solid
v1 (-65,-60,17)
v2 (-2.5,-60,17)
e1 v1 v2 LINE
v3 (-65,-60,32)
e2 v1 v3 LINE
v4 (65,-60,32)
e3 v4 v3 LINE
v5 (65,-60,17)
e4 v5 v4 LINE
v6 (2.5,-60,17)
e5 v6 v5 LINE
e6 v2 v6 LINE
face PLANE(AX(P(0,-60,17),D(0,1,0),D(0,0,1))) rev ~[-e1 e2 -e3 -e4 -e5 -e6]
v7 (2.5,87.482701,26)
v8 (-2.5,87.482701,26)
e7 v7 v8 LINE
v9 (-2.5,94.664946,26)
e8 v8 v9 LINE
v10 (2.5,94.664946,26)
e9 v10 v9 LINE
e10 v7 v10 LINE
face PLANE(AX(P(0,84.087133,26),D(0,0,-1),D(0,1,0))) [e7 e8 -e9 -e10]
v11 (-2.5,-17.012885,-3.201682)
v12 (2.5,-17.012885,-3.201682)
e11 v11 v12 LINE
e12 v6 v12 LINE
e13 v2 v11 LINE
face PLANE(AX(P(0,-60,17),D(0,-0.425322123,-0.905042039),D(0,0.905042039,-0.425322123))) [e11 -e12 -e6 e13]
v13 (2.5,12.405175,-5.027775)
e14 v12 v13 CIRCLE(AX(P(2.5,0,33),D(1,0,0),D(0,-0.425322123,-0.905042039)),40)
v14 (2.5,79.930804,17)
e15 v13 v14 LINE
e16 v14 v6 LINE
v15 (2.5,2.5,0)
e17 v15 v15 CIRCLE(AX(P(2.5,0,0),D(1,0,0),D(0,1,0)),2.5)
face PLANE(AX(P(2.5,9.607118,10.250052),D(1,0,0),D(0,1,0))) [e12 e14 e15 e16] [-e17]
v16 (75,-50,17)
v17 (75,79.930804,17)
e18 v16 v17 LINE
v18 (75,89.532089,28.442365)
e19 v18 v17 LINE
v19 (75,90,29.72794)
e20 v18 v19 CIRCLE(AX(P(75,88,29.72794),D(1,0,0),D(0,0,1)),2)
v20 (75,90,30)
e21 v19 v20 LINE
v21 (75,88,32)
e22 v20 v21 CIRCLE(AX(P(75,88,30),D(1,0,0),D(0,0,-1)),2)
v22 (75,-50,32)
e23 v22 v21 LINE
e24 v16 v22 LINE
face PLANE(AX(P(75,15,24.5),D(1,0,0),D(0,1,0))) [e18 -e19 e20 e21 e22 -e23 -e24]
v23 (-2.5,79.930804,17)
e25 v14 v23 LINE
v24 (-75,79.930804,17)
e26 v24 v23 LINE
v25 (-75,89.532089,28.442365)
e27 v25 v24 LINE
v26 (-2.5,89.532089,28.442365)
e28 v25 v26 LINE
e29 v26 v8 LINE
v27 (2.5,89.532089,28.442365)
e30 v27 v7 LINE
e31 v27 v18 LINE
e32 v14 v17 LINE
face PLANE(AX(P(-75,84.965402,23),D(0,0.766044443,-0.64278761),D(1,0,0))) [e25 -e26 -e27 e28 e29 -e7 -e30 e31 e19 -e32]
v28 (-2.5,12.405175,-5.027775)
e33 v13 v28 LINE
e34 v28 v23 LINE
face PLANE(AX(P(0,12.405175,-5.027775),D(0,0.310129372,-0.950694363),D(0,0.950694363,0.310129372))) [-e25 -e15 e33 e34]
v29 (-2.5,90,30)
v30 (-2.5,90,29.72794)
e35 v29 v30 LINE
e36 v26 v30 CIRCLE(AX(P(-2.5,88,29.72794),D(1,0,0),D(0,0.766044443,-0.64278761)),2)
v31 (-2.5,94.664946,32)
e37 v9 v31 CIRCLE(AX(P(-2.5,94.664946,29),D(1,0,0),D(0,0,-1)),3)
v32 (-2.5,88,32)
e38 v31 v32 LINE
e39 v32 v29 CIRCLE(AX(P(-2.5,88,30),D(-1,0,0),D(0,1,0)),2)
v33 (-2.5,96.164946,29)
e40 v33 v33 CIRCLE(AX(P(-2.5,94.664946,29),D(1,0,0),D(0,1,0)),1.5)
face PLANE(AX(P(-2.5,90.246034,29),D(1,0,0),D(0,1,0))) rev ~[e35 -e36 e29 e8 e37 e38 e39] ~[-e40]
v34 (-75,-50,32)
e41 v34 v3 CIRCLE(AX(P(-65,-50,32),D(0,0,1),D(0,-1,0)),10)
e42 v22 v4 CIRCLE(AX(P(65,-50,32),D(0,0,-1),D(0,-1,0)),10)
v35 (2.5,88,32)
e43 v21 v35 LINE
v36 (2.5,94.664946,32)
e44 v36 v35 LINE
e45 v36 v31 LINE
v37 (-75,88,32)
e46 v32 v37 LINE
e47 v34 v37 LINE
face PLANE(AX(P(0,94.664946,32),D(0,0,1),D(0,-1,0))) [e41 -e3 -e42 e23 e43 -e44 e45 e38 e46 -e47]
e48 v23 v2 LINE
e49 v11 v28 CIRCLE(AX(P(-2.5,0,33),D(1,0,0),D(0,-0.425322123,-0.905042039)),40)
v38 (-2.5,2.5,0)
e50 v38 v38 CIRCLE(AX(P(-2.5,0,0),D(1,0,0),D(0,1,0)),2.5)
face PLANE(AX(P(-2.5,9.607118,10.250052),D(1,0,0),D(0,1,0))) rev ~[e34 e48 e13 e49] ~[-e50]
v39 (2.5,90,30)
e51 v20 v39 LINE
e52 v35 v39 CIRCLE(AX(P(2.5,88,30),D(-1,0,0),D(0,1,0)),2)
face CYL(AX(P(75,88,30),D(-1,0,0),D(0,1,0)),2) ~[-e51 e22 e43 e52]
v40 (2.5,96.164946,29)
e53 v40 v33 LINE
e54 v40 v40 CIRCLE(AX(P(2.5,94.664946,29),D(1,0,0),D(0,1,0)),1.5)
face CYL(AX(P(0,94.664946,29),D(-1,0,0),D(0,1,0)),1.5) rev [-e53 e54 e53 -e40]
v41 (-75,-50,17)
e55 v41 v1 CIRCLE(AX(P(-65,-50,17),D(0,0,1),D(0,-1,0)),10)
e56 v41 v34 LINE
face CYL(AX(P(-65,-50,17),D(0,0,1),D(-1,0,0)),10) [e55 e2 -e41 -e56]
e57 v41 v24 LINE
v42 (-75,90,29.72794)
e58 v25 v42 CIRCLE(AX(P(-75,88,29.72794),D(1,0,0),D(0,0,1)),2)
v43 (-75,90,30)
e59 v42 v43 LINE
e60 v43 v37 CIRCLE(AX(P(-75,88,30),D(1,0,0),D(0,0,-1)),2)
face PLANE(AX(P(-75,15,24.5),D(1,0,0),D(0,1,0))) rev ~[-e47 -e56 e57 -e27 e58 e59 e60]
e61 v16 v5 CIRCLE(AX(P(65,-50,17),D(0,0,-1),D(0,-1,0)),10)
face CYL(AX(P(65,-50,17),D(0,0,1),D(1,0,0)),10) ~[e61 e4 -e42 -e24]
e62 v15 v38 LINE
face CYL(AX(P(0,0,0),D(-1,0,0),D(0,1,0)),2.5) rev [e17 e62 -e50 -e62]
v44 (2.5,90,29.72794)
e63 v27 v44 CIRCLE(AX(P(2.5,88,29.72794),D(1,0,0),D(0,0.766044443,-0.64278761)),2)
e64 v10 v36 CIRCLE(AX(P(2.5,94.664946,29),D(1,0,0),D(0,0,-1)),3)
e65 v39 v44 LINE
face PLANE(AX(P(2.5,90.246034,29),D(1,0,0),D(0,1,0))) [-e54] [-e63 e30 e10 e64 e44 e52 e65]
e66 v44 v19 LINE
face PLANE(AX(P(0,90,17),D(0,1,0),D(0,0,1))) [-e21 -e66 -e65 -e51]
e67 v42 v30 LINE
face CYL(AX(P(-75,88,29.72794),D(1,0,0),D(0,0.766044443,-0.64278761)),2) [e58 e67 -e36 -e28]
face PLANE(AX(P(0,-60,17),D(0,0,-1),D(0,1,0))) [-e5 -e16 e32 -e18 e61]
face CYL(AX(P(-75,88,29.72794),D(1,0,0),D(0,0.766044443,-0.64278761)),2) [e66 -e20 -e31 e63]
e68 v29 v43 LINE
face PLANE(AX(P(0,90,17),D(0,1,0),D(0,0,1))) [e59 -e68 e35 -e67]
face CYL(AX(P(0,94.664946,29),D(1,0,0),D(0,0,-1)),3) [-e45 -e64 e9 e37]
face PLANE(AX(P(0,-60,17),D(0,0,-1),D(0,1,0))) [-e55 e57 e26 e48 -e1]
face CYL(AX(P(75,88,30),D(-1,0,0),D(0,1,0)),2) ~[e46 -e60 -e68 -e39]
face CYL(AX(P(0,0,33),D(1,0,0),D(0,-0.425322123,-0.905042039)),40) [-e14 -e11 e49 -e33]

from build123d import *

# Parameters (mm, degrees)
F0_W     = 150
F0_H     = 15
F1_DEPTH = 75
F2_SIZE2 = 10.0691955741
F2_SIZE  = 12
F3_R     = 2
F4_R     = 2.5
F5_DEPTH = 2.5
F6_R     = 1.5
F7_DEPTH = 2.5
F8_R     = 10


with BuildPart() as f1:
    # F0 (on Right) → F1 (new body, symmetric)
    with BuildSketch(Plane.YZ):
        with Locations((15, 24.5)):
            Rectangle(F0_W, F0_H)
    extrude(amount=F1_DEPTH, both=True)

    # F2
    f2_edges = [f1.edges().sort_by_distance(p)[0] for p in [
        (0, 90, 17),
    ]]
    f2_side = f1.faces().sort_by_distance((0, 90, 24.5))[0]
    chamfer(f2_edges, length=F2_SIZE, length2=F2_SIZE2, reference=f2_side)

    # F3
    f3_edges = [f1.edges().sort_by_distance(p)[0] for p in [
        (0, 90, 32),
        (0, 90, 29),
    ]]
    fillet(f3_edges, radius=F3_R)

    # F4 (on Right) → F5 (join, symmetric)
    with BuildSketch(Plane.YZ):
        with BuildLine():
            Line((79.9308044259, 17), (-60, 17))
            Line((-60, 17), (-17.0128849215, -3.2016815445))
            ThreePointArc((-17.0128849215, -3.2016815445), (-2.4781851934, -6.9231586695), (12.4051748829, -5.0277745355))
            Line((12.4051748829, -5.0277745355), (79.9308044259, 17))
        make_face()
        Circle(F4_R, mode=Mode.SUBTRACT)
    extrude(amount=F5_DEPTH, both=True)

    # F6 (on Right) → F7 (join, symmetric)
    with BuildSketch(Plane.YZ):
        with BuildLine():
            Line((94.6649461985, 32), (84.0871334076, 32))
            Line((84.0871334076, 32), (84.0871334076, 26))
            Line((84.0871334076, 26), (94.6649461985, 26))
            ThreePointArc((94.6649461985, 26), (97.6649461985, 29), (94.6649461985, 32))
        make_face()
        with Locations((94.6649461985, 29)):
            Circle(F6_R, mode=Mode.SUBTRACT)
    extrude(amount=F7_DEPTH, both=True)

    # F8
    f8_edges = [f1.edges().sort_by_distance(p)[0] for p in [
        (75, -60, 24.5),
        (-75, -60, 24.5),
    ]]
    fillet(f8_edges, radius=F8_R)


solid = f1.part
